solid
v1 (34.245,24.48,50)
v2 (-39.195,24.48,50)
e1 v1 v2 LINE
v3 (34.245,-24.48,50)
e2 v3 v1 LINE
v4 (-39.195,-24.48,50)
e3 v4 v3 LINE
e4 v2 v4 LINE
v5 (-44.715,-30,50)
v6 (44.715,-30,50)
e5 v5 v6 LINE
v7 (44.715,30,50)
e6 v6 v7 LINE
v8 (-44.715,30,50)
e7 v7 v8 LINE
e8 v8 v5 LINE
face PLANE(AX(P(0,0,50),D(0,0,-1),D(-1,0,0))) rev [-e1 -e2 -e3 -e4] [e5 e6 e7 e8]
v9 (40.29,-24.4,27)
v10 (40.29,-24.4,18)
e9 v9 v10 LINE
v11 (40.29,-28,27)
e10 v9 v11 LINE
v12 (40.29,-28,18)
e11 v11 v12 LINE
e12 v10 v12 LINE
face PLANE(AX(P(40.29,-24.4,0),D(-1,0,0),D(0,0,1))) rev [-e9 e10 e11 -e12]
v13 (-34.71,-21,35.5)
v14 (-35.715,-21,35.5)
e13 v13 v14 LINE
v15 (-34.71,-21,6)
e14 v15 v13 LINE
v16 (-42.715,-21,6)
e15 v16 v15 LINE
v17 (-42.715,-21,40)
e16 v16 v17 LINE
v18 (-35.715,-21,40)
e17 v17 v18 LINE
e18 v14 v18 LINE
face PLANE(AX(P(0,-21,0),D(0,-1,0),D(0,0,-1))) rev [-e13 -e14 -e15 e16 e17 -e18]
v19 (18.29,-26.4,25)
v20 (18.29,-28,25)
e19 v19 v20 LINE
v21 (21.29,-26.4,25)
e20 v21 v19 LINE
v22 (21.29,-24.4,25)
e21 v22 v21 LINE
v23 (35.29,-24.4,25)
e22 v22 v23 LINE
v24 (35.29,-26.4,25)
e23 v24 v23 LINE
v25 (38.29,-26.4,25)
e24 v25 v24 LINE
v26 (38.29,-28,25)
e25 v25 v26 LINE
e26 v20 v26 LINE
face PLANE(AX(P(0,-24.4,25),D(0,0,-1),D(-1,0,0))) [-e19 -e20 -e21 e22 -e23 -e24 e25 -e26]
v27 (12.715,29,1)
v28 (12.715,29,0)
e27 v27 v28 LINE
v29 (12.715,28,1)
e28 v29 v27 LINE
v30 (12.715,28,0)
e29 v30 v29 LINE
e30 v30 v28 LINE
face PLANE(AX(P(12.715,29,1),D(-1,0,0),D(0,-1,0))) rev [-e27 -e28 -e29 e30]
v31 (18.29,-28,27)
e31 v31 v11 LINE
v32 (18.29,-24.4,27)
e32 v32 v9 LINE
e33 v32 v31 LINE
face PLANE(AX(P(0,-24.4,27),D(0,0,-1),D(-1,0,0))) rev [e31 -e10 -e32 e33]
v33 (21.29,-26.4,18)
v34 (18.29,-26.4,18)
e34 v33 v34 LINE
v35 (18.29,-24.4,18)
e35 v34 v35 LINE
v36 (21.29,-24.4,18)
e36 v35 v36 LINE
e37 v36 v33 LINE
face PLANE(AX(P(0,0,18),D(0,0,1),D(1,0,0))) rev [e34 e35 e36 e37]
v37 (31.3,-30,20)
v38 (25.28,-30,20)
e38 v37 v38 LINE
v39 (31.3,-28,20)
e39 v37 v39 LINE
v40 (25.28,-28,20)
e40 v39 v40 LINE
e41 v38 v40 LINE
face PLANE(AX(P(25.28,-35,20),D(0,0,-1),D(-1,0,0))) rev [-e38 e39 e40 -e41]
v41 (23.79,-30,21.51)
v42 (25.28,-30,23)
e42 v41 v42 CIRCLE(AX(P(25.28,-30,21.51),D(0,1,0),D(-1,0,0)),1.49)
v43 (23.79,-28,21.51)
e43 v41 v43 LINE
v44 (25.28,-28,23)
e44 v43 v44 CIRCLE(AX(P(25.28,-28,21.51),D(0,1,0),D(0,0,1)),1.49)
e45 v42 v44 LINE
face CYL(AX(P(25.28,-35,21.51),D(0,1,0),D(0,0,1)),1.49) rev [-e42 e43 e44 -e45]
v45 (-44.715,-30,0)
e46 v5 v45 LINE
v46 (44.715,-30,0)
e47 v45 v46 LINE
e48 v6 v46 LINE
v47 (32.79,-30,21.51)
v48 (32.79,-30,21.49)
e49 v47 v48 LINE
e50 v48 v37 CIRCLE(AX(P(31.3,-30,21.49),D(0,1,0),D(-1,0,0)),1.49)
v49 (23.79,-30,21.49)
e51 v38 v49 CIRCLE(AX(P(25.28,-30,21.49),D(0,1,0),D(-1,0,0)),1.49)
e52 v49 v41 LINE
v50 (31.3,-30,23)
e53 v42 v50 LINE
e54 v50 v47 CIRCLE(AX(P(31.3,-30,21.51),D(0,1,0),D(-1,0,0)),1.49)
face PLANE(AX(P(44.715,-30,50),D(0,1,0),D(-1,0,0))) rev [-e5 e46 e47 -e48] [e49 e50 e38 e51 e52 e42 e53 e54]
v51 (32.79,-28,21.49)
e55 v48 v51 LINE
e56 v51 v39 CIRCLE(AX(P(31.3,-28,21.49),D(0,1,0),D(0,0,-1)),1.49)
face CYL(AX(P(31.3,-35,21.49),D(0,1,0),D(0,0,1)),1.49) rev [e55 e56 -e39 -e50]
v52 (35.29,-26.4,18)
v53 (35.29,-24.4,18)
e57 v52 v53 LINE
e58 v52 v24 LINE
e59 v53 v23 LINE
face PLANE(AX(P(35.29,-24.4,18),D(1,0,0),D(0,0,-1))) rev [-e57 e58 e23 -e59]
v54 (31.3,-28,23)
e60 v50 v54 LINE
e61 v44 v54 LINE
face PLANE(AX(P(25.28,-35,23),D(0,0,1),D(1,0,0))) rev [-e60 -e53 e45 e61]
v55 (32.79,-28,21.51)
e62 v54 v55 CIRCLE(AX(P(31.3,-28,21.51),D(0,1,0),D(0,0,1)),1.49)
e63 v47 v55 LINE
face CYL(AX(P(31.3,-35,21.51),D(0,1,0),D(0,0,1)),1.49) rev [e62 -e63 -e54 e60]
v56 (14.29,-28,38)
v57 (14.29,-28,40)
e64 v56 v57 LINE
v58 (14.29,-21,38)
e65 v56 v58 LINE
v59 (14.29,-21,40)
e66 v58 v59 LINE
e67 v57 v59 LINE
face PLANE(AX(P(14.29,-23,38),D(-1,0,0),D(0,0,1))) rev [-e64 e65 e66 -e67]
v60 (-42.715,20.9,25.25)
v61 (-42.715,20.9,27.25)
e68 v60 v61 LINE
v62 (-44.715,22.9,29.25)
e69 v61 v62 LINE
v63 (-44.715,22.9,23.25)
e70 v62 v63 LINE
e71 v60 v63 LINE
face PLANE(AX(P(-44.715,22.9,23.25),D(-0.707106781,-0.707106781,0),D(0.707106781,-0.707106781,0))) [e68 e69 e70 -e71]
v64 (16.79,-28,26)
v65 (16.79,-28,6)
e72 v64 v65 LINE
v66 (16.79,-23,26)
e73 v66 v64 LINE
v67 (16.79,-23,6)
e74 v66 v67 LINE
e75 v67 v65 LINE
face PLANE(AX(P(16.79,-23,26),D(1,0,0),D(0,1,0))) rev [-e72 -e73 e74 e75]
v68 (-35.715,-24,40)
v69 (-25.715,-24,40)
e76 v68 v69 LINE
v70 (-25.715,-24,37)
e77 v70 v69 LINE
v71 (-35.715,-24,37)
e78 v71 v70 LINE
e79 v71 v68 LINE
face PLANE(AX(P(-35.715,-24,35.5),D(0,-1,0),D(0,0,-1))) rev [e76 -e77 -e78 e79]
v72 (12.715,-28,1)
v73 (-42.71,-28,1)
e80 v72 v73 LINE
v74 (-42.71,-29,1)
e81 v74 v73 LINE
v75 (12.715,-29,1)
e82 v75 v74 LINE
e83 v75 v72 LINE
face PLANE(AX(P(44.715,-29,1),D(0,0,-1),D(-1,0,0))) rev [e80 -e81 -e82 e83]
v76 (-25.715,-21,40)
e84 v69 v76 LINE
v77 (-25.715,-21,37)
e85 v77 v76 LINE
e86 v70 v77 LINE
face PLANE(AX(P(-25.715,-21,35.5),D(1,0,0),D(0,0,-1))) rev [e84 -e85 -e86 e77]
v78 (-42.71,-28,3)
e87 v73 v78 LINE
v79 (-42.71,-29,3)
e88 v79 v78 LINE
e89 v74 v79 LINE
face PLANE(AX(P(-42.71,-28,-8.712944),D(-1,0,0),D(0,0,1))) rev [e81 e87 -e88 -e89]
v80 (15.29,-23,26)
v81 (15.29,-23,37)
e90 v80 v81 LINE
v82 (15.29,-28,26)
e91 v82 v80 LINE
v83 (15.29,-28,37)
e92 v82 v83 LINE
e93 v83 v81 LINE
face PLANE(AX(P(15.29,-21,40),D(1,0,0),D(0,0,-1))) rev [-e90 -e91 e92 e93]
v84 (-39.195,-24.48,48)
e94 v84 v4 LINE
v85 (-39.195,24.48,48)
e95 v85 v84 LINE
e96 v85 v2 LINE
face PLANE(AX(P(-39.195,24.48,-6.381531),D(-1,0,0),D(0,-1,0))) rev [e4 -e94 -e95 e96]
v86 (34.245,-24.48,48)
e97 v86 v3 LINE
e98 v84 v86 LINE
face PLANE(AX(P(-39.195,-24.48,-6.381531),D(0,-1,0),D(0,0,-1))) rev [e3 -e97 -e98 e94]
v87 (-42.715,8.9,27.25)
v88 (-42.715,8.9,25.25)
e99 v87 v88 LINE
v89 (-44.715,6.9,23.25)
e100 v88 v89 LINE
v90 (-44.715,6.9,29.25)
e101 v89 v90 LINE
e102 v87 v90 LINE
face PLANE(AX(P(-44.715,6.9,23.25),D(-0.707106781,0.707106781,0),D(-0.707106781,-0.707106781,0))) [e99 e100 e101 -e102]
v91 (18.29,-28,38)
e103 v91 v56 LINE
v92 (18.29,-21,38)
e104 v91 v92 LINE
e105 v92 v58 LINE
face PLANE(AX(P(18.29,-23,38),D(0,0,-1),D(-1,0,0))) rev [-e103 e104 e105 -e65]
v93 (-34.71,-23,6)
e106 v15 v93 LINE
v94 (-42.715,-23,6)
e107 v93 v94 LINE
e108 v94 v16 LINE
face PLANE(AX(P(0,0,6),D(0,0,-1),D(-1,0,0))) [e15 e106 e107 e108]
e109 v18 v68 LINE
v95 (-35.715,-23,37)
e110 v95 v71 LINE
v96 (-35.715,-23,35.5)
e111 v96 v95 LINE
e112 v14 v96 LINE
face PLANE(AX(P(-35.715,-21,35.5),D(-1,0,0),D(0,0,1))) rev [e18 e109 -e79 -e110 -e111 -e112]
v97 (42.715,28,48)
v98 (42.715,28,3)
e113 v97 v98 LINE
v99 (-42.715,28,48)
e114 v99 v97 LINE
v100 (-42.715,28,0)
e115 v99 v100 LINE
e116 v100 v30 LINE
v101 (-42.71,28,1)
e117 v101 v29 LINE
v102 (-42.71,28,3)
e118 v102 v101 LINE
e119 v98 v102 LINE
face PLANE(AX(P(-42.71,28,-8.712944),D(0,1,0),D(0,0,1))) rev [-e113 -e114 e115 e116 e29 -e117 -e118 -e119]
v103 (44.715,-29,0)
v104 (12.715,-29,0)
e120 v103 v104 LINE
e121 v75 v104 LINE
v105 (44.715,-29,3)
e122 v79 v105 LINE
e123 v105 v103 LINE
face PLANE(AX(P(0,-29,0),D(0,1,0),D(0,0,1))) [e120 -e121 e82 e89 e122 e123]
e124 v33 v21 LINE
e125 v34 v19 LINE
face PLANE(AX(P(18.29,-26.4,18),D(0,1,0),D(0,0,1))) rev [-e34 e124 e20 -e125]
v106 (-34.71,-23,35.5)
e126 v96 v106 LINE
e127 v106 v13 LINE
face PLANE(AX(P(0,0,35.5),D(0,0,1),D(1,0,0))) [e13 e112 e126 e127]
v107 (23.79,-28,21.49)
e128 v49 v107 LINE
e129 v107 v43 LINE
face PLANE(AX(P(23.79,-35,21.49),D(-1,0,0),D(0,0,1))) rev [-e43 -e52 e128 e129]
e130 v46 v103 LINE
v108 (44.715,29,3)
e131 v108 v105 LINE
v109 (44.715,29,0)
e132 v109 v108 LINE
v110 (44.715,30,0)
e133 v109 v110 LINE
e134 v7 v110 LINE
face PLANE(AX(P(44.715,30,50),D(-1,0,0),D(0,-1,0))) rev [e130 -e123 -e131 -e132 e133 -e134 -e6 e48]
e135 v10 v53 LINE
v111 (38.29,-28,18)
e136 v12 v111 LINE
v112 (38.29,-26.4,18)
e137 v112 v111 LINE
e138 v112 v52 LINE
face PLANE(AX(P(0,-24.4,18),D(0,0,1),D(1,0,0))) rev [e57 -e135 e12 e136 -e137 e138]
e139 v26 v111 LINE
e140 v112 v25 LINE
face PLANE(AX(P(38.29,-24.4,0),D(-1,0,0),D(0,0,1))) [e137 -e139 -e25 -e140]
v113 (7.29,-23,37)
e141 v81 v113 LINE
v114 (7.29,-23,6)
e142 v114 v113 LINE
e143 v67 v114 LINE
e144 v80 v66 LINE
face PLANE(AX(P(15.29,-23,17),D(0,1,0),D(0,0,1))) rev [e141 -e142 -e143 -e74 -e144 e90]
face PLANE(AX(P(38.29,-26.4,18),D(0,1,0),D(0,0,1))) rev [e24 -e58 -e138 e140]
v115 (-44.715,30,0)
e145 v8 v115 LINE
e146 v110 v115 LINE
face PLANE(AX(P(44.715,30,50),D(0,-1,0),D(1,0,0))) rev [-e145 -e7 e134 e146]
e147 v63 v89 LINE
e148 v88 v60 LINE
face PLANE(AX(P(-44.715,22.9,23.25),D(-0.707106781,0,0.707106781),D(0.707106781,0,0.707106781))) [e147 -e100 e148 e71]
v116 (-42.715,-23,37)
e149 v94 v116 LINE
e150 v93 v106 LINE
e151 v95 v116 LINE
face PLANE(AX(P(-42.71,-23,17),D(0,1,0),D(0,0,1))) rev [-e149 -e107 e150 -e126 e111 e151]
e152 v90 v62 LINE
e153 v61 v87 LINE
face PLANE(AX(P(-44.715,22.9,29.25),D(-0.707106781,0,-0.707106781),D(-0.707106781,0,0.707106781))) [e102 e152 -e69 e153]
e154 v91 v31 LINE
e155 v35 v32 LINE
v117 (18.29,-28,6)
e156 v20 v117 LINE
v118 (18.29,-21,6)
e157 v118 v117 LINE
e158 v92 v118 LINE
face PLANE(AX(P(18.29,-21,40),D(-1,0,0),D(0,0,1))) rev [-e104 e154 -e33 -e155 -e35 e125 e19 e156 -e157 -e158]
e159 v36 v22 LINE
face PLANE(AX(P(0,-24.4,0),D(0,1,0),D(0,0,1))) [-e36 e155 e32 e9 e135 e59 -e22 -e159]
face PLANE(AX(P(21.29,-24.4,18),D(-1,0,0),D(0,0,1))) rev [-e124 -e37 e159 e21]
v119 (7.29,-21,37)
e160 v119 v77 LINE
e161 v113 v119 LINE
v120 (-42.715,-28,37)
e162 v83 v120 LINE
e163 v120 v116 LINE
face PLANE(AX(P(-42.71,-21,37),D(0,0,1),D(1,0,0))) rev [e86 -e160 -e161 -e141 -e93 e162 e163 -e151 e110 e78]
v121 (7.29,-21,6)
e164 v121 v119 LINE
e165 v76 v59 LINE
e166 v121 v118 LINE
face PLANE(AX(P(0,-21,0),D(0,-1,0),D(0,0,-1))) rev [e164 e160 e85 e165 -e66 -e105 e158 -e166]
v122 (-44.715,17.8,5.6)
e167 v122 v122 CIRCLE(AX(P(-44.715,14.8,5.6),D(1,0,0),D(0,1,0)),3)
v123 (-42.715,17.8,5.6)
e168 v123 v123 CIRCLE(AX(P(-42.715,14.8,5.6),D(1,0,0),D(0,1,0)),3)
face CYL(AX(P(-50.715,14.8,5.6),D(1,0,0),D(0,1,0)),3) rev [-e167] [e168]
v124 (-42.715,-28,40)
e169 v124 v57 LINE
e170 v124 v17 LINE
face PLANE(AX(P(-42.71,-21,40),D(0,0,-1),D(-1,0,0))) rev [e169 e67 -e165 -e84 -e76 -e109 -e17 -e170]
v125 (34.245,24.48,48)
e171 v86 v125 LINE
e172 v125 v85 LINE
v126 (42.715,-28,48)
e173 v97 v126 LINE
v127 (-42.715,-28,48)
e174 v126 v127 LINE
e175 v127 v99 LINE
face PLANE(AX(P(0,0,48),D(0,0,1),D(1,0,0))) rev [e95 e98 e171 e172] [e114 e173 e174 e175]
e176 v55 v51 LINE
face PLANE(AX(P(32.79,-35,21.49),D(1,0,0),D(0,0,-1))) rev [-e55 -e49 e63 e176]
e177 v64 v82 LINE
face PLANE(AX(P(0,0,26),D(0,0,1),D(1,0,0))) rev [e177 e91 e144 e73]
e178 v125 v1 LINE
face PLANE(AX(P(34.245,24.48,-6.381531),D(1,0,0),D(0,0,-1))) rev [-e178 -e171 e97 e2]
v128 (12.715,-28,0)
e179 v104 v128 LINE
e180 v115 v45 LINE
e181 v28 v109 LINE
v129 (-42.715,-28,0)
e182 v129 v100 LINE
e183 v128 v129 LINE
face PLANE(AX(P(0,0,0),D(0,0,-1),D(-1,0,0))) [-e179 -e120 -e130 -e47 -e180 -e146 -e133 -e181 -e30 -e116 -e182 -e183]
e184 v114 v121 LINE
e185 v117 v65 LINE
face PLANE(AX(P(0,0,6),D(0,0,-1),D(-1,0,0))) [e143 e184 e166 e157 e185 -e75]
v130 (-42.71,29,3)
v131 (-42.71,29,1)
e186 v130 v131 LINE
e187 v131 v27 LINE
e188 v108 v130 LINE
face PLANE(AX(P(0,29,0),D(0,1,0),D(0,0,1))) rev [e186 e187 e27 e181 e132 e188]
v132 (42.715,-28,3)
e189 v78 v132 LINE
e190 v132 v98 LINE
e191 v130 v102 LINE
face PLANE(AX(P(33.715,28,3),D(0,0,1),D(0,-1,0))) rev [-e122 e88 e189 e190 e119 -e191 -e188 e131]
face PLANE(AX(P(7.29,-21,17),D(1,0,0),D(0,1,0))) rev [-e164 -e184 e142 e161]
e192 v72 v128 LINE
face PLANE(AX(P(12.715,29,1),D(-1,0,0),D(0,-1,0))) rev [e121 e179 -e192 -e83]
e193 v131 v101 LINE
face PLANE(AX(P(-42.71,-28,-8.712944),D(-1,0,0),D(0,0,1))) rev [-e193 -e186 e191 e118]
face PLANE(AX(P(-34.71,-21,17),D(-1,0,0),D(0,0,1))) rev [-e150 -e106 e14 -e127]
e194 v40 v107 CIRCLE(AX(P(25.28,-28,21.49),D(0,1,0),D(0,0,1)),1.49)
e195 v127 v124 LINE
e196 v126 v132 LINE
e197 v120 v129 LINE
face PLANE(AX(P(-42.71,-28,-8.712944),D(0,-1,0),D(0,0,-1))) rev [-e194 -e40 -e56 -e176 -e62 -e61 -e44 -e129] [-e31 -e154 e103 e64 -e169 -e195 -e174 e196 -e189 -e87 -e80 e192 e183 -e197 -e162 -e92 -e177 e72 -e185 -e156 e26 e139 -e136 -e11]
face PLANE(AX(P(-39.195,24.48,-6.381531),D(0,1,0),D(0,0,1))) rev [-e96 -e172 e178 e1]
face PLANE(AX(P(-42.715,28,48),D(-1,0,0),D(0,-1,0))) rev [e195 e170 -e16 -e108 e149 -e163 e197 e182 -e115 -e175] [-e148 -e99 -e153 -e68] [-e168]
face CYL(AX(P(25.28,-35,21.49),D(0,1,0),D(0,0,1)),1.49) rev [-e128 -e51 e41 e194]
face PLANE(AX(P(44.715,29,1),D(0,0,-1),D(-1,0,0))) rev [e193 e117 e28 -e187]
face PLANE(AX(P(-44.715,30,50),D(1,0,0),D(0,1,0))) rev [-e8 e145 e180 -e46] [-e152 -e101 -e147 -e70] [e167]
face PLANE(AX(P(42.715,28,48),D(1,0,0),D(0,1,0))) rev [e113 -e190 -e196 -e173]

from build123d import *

# Parameters (mm, degrees)
SKETCH_1_W           = 89.43
SKETCH_1_H           = 60
EXTRUDE_2_DEPTH      = 50
EXTRUDE_START        = -50
EXTRUDE_3_OUTLINE_W  = 85.42
EXTRUDE_3_OUTLINE_H  = 56
EXTRUDE_3_DEPTH      = 50
SKETCH_3_W           = 89.43
SKETCH_3_H           = 60
EXTRUDE_4_DEPTH      = 2
EXTRUDE_START_2      = -2
EXTRUDE_5_OUTLINE_W  = 73.44
EXTRUDE_5_OUTLINE_H  = 48.96
EXTRUDE_5_DEPTH      = 2
SKETCH_6_W           = 2
SKETCH_6_H           = 12
CUT_EXTRUDE_6_DEPTH  = 10
SKETCH_8_W           = 6
SKETCH_8_H           = 16
CUT_EXTRUDE_7_DEPTH  = 10
DRAFT_2_ANGLE        = 45
SKETCH_9_W           = 61
SKETCH_9_H           = 3
EXTRUDE_5_2_DEPTH    = 7
SKETCH_10_W          = 3
SKETCH_10_H          = 40
EXTRUDE_6_DEPTH      = 7
SKETCH_11_W          = 8
SKETCH_11_H          = 2
EXTRUDE_7_DEPTH      = 20
SKETCH_12_W          = 3
SKETCH_12_H          = 7
CUT_EXTRUDE_8_DEPTH  = 6
SKETCH_13_W          = 8
SKETCH_13_H          = 2
EXTRUDE_8_DEPTH      = 11
SKETCH_14_W          = 3
SKETCH_14_H          = 56
CUT_EXTRUDE_10_DEPTH = 11
SKETCH_15_W          = 87.425
SKETCH_15_H          = 2
CUT_EXTRUDE_11_DEPTH = 1
SKETCH_16_W          = 87.425
SKETCH_16_H          = 2
CUT_EXTRUDE_12_DEPTH = 1
SKETCH_17_R          = 3
CUT_EXTRUDE_13_DEPTH = 5.4
EXTRUDE_9_DEPTH      = 3.6
SKETCH_20_W          = 3
SKETCH_20_H          = 2
EXTRUDE_10_DEPTH     = 7
CUT_EXTRUDE_15_DEPTH = 7
SKETCH_22_W          = 32
SKETCH_22_H          = 58
CUT_EXTRUDE_16_DEPTH = 1
SKETCH_25_W          = 3
SKETCH_25_H          = 2
CUT_EXTRUDE_18_DEPTH = 2
SKETCH_27_W          = 4
SKETCH_27_H          = 2
CUT_EXTRUDE_19_DEPTH = 2
SKETCH_29_W          = 2.005
SKETCH_29_H          = 11.917011913
EXTRUDE_12_DEPTH     = 17
SKETCH_31_W          = 1.611039623
SKETCH_31_H          = 56
SKETCH_31_W_2        = 2
CUT_EXTRUDE_20_DEPTH = 48
SKETCH_34_W          = 8.005
SKETCH_34_H          = 34
EXTRUDE_13_DEPTH     = 2
SKETCH_35_W          = 8.005
SKETCH_35_H          = 3
EXTRUDE_14_DEPTH     = 8
SKETCH_36_R          = 3
CUT_EXTRUDE_21_DEPTH = 8
SKETCH_37_W          = 4
SKETCH_37_H          = 2
CUT_EXTRUDE_22_DEPTH = 5
SKETCH_38_W          = 10
SKETCH_38_H          = 3
CUT_EXTRUDE_23_DEPTH = 4.5
SKETCH_39_W          = 1.5
SKETCH_39_H          = 5
CUT_EXTRUDE_24_DEPTH = 20


# Read off the part's stored shape, not the designer's step: 切除-拉伸3, 切除-拉伸5
with BuildPart() as part:
    # 草图1 → 凸台-拉伸2 (new body)
    with BuildSketch(Plane.XY):
        Rectangle(SKETCH_1_W, SKETCH_1_H)
    extrude(amount=EXTRUDE_2_DEPTH)

    # 切除-拉伸3 outline → 切除-拉伸3 (cut)
    with BuildSketch(Plane.XY.offset(50).offset(EXTRUDE_START)):
        Rectangle(EXTRUDE_3_OUTLINE_W, EXTRUDE_3_OUTLINE_H)
    extrude(amount=EXTRUDE_3_DEPTH, mode=Mode.SUBTRACT)

    # 草图3 → 凸台-拉伸4 (add)
    with BuildSketch(Plane.XY.offset(50)):
        Rectangle(SKETCH_3_W, SKETCH_3_H)
    extrude(amount=-EXTRUDE_4_DEPTH)

    # Extrude 5 outline → Extrude 5 (cut)
    with BuildSketch(Plane.XY.offset(50).offset(EXTRUDE_START_2)):
        with Locations((-2.475, 0)):
            Rectangle(EXTRUDE_5_OUTLINE_W, EXTRUDE_5_OUTLINE_H)
    extrude(amount=EXTRUDE_5_DEPTH, mode=Mode.SUBTRACT)

    # 草图6 → 切除-拉伸6 (cut)
    with BuildSketch(Plane.ZY.offset(44.715)):
        with Locations((26.25, 14.9)):
            Rectangle(SKETCH_6_W, SKETCH_6_H)
    extrude(amount=-CUT_EXTRUDE_6_DEPTH, mode=Mode.SUBTRACT)

    # 草图8 → 切除-拉伸7 (cut)
    with BuildSketch(Plane.ZY.offset(44.715)):
        with Locations((26.25, 14.9)):
            Rectangle(SKETCH_8_W, SKETCH_8_H)
    extrude(amount=-CUT_EXTRUDE_7_DEPTH, mode=Mode.SUBTRACT)

    # 拔模2
    draft_2_faces = [part.faces().sort_by_distance(p)[0] for p in [
        (-43.7125, 22.9, 26.25),
        (-43.7125, 14.9, 23.25),
        (-43.7125, 6.9, 26.25),
        (-43.7125, 14.9, 29.25),
    ]]
    draft(draft_2_faces, Plane(origin=(-44.715, 30, 50), x_dir=(0, -1, 0), z_dir=(-1, 0, 0)), DRAFT_2_ANGLE)

    # 草图9 → Extrude 5 2 (add)
    with BuildSketch(Plane(origin=(0, -28, 0), x_dir=(1, 0, 0), z_dir=(0, 1, 0))):
        with Locations((-12.21, -38.5)):
            Rectangle(SKETCH_9_W, SKETCH_9_H)
    extrude(amount=EXTRUDE_5_2_DEPTH)

    # 草图10 → 凸台-拉伸6 (add)
    with BuildSketch(Plane(origin=(0, -28, 0), x_dir=(1, 0, 0), z_dir=(0, 1, 0))):
        with Locations((16.79, -20)):
            Rectangle(SKETCH_10_W, SKETCH_10_H)
    extrude(amount=EXTRUDE_6_DEPTH)

    # 草图11 → 凸台-拉伸7 (add)
    with BuildSketch(Plane(origin=(0, 0, 37), x_dir=(-1, 0, 0), z_dir=(0, 0, -1))):
        with Locations((-11.29, -22)):
            Rectangle(SKETCH_11_W, SKETCH_11_H)
        with Locations((38.71, -22)):
            Rectangle(SKETCH_11_W, SKETCH_11_H)
    extrude(amount=EXTRUDE_7_DEPTH)

    # 草图12 → 切除-拉伸8 (cut)
    with BuildSketch(Plane(origin=(0, 0, 0), x_dir=(-1, 0, 0), z_dir=(0, 0, -1))):
        with Locations((-16.79, -24.5)):
            Rectangle(SKETCH_12_W, SKETCH_12_H)
    extrude(amount=-CUT_EXTRUDE_8_DEPTH, mode=Mode.SUBTRACT)

    # 草图13 → 凸台-拉伸8 (add)
    with BuildSketch(Plane(origin=(0, 0, 17), x_dir=(-1, 0, 0), z_dir=(0, 0, -1))):
        with Locations((-11.29, -22)):
            Rectangle(SKETCH_13_W, SKETCH_13_H)
        with Locations((38.71, -22)):
            Rectangle(SKETCH_13_W, SKETCH_13_H)
    extrude(amount=EXTRUDE_8_DEPTH)

    # 草图14 → 切除-拉伸10 (cut)
    with BuildSketch(Plane(origin=(44.715, 0, 0), x_dir=(0, 0, -1), z_dir=(1, 0, 0))):
        with Locations((-1.5, 0)):
            Rectangle(SKETCH_14_W, SKETCH_14_H)
    extrude(amount=-CUT_EXTRUDE_10_DEPTH, mode=Mode.SUBTRACT)

    # 草图15 → 切除-拉伸11 (cut)
    with BuildSketch(Plane.XZ.offset(-28)):
        with Locations((1.0025, 2)):
            Rectangle(SKETCH_15_W, SKETCH_15_H)
    extrude(amount=-CUT_EXTRUDE_11_DEPTH, mode=Mode.SUBTRACT)

    # 草图16 → 切除-拉伸12 (cut)
    with BuildSketch(Plane(origin=(0, -28, 0), x_dir=(1, 0, 0), z_dir=(0, 1, 0))):
        with Locations((1.0025, -2)):
            Rectangle(SKETCH_16_W, SKETCH_16_H)
    extrude(amount=-CUT_EXTRUDE_12_DEPTH, mode=Mode.SUBTRACT)

    # 草图17 → 切除-拉伸13 (cut)
    with BuildSketch(Plane.ZY.offset(44.715)):
        with Locations(Location((11.4, 18, 0), (0, 0, 270))):
            Circle(SKETCH_17_R)
    extrude(amount=-CUT_EXTRUDE_13_DEPTH, mode=Mode.SUBTRACT)

    # 草图18 → 凸台-拉伸9 (add)
    with BuildSketch(Plane(origin=(0, -28, 0), x_dir=(1, 0, 0), z_dir=(0, 1, 0))):
        Polygon((18.29, -25), (18.29, -27), (40.29, -27), (40.29, -18), (38.29, -18), (38.29, -25), align=None)
    extrude(amount=EXTRUDE_9_DEPTH)

    # 草图20 → 凸台-拉伸10 (add)
    with BuildSketch(Plane(origin=(0, 0, 25), x_dir=(-1, 0, 0), z_dir=(0, 0, -1))):
        with Locations((-36.79, -25.4)):
            Rectangle(SKETCH_20_W, SKETCH_20_H)
        with Locations((-19.79, -25.4)):
            Rectangle(SKETCH_20_W, SKETCH_20_H)
    extrude(amount=EXTRUDE_10_DEPTH)

    # 草图21 → 切除-拉伸15 (cut)
    with BuildSketch(Plane(origin=(0, -28, 0), x_dir=(1, 0, 0), z_dir=(0, 1, 0))):
        with BuildLine():
            Line((25.28, -20), (31.3, -20))
            ThreePointArc((31.3, -20), (32.353589104, -20.436410896), (32.79, -21.49))
            Line((32.79, -21.49), (32.79, -21.51))
            ThreePointArc((32.79, -21.51), (32.353589104, -22.563589104), (31.3, -23))
            Line((31.3, -23), (25.28, -23))
            ThreePointArc((25.28, -23), (24.226410896, -22.563589104), (23.79, -21.51))
            Line((23.79, -21.51), (23.79, -21.49))
            ThreePointArc((23.79, -21.49), (24.226410896, -20.436410896), (25.28, -20))
        make_face()
    extrude(amount=-CUT_EXTRUDE_15_DEPTH, mode=Mode.SUBTRACT)

    # 草图22 → 切除-拉伸16 (cut)
    with BuildSketch(Plane(origin=(0, 0, 0), x_dir=(-1, 0, 0), z_dir=(0, 0, -1))):
        with Locations((-28.715, 0)):
            Rectangle(SKETCH_22_W, SKETCH_22_H)
    extrude(amount=-CUT_EXTRUDE_16_DEPTH, mode=Mode.SUBTRACT)

    # 草图25 → 切除-拉伸18 (cut)
    with BuildSketch(Plane(origin=(0, -21, 0), x_dir=(1, 0, 0), z_dir=(0, 1, 0))):
        with Locations((16.79, -39)):
            Rectangle(SKETCH_25_W, SKETCH_25_H)
    extrude(amount=-CUT_EXTRUDE_18_DEPTH, mode=Mode.SUBTRACT)

    # 草图27 → 切除-拉伸19 (cut)
    with BuildSketch(Plane(origin=(0, -21, 0), x_dir=(1, 0, 0), z_dir=(0, 1, 0))):
        with Locations((16.29, -39)):
            Rectangle(SKETCH_27_W, SKETCH_27_H)
    extrude(amount=-CUT_EXTRUDE_19_DEPTH, mode=Mode.SUBTRACT)

    # 草图29 → 凸台-拉伸12 (add)
    with BuildSketch(Plane(origin=(0, 0, 0), x_dir=(-1, 0, 0), z_dir=(0, 0, -1))):
        with Locations((43.7125, 17.342942197)):
            Rectangle(SKETCH_29_W, SKETCH_29_H)
    extrude(amount=-EXTRUDE_12_DEPTH)

    # 草图31 → 切除-拉伸20 (cut)
    with BuildSketch(Plane(origin=(0, 0, 0), x_dir=(-1, 0, 0), z_dir=(0, 0, -1))):
        with Locations((-41.909480188, 0)):
            Rectangle(SKETCH_31_W, SKETCH_31_H)
        with Locations((41.715, 0)):
            Rectangle(SKETCH_31_W_2, SKETCH_31_H)
    extrude(amount=-CUT_EXTRUDE_20_DEPTH, mode=Mode.SUBTRACT)

    # 草图34 → 凸台-拉伸13 (add)
    with BuildSketch(Plane(origin=(0, -21, 0), x_dir=(1, 0, 0), z_dir=(0, 1, 0))):
        with Locations((-38.7125, -23)):
            Rectangle(SKETCH_34_W, SKETCH_34_H)
    extrude(amount=-EXTRUDE_13_DEPTH)

    # 草图35 → 凸台-拉伸14 (add)
    with BuildSketch(Plane(origin=(0, -21, 0), x_dir=(1, 0, 0), z_dir=(0, 1, 0))):
        with Locations((-38.7125, -38.5)):
            Rectangle(SKETCH_35_W, SKETCH_35_H)
    extrude(amount=-EXTRUDE_14_DEPTH)

    # 草图36 → 切除-拉伸21 (cut)
    with BuildSketch(Plane(origin=(-42.715, 0, 0), x_dir=(0, 0, -1), z_dir=(1, 0, 0))):
        with Locations(Location((-5.6, 14.8, 0), (0, 0, 90))):
            Circle(SKETCH_36_R)
    extrude(amount=-CUT_EXTRUDE_21_DEPTH, mode=Mode.SUBTRACT)

    # 草图37 → 切除-拉伸22 (cut)
    with BuildSketch(Plane(origin=(0, -23, 0), x_dir=(1, 0, 0), z_dir=(0, 1, 0))):
        with Locations((16.29, -39)):
            Rectangle(SKETCH_37_W, SKETCH_37_H)
    extrude(amount=-CUT_EXTRUDE_22_DEPTH, mode=Mode.SUBTRACT)

    # 草图38 → 切除-拉伸23 (cut)
    with BuildSketch(Plane.XY.offset(40)):
        with Locations((-30.715, -22.5)):
            Rectangle(SKETCH_38_W, SKETCH_38_H)
    extrude(amount=-CUT_EXTRUDE_23_DEPTH, mode=Mode.SUBTRACT)

    # 草图39 → 切除-拉伸24 (cut)
    with BuildSketch(Plane(origin=(0, 0, 6), x_dir=(-1, 0, 0), z_dir=(0, 0, -1))):
        with Locations((-16.04, -25.5)):
            Rectangle(SKETCH_39_W, SKETCH_39_H)
    extrude(amount=-CUT_EXTRUDE_24_DEPTH, mode=Mode.SUBTRACT)


solid = part.part
